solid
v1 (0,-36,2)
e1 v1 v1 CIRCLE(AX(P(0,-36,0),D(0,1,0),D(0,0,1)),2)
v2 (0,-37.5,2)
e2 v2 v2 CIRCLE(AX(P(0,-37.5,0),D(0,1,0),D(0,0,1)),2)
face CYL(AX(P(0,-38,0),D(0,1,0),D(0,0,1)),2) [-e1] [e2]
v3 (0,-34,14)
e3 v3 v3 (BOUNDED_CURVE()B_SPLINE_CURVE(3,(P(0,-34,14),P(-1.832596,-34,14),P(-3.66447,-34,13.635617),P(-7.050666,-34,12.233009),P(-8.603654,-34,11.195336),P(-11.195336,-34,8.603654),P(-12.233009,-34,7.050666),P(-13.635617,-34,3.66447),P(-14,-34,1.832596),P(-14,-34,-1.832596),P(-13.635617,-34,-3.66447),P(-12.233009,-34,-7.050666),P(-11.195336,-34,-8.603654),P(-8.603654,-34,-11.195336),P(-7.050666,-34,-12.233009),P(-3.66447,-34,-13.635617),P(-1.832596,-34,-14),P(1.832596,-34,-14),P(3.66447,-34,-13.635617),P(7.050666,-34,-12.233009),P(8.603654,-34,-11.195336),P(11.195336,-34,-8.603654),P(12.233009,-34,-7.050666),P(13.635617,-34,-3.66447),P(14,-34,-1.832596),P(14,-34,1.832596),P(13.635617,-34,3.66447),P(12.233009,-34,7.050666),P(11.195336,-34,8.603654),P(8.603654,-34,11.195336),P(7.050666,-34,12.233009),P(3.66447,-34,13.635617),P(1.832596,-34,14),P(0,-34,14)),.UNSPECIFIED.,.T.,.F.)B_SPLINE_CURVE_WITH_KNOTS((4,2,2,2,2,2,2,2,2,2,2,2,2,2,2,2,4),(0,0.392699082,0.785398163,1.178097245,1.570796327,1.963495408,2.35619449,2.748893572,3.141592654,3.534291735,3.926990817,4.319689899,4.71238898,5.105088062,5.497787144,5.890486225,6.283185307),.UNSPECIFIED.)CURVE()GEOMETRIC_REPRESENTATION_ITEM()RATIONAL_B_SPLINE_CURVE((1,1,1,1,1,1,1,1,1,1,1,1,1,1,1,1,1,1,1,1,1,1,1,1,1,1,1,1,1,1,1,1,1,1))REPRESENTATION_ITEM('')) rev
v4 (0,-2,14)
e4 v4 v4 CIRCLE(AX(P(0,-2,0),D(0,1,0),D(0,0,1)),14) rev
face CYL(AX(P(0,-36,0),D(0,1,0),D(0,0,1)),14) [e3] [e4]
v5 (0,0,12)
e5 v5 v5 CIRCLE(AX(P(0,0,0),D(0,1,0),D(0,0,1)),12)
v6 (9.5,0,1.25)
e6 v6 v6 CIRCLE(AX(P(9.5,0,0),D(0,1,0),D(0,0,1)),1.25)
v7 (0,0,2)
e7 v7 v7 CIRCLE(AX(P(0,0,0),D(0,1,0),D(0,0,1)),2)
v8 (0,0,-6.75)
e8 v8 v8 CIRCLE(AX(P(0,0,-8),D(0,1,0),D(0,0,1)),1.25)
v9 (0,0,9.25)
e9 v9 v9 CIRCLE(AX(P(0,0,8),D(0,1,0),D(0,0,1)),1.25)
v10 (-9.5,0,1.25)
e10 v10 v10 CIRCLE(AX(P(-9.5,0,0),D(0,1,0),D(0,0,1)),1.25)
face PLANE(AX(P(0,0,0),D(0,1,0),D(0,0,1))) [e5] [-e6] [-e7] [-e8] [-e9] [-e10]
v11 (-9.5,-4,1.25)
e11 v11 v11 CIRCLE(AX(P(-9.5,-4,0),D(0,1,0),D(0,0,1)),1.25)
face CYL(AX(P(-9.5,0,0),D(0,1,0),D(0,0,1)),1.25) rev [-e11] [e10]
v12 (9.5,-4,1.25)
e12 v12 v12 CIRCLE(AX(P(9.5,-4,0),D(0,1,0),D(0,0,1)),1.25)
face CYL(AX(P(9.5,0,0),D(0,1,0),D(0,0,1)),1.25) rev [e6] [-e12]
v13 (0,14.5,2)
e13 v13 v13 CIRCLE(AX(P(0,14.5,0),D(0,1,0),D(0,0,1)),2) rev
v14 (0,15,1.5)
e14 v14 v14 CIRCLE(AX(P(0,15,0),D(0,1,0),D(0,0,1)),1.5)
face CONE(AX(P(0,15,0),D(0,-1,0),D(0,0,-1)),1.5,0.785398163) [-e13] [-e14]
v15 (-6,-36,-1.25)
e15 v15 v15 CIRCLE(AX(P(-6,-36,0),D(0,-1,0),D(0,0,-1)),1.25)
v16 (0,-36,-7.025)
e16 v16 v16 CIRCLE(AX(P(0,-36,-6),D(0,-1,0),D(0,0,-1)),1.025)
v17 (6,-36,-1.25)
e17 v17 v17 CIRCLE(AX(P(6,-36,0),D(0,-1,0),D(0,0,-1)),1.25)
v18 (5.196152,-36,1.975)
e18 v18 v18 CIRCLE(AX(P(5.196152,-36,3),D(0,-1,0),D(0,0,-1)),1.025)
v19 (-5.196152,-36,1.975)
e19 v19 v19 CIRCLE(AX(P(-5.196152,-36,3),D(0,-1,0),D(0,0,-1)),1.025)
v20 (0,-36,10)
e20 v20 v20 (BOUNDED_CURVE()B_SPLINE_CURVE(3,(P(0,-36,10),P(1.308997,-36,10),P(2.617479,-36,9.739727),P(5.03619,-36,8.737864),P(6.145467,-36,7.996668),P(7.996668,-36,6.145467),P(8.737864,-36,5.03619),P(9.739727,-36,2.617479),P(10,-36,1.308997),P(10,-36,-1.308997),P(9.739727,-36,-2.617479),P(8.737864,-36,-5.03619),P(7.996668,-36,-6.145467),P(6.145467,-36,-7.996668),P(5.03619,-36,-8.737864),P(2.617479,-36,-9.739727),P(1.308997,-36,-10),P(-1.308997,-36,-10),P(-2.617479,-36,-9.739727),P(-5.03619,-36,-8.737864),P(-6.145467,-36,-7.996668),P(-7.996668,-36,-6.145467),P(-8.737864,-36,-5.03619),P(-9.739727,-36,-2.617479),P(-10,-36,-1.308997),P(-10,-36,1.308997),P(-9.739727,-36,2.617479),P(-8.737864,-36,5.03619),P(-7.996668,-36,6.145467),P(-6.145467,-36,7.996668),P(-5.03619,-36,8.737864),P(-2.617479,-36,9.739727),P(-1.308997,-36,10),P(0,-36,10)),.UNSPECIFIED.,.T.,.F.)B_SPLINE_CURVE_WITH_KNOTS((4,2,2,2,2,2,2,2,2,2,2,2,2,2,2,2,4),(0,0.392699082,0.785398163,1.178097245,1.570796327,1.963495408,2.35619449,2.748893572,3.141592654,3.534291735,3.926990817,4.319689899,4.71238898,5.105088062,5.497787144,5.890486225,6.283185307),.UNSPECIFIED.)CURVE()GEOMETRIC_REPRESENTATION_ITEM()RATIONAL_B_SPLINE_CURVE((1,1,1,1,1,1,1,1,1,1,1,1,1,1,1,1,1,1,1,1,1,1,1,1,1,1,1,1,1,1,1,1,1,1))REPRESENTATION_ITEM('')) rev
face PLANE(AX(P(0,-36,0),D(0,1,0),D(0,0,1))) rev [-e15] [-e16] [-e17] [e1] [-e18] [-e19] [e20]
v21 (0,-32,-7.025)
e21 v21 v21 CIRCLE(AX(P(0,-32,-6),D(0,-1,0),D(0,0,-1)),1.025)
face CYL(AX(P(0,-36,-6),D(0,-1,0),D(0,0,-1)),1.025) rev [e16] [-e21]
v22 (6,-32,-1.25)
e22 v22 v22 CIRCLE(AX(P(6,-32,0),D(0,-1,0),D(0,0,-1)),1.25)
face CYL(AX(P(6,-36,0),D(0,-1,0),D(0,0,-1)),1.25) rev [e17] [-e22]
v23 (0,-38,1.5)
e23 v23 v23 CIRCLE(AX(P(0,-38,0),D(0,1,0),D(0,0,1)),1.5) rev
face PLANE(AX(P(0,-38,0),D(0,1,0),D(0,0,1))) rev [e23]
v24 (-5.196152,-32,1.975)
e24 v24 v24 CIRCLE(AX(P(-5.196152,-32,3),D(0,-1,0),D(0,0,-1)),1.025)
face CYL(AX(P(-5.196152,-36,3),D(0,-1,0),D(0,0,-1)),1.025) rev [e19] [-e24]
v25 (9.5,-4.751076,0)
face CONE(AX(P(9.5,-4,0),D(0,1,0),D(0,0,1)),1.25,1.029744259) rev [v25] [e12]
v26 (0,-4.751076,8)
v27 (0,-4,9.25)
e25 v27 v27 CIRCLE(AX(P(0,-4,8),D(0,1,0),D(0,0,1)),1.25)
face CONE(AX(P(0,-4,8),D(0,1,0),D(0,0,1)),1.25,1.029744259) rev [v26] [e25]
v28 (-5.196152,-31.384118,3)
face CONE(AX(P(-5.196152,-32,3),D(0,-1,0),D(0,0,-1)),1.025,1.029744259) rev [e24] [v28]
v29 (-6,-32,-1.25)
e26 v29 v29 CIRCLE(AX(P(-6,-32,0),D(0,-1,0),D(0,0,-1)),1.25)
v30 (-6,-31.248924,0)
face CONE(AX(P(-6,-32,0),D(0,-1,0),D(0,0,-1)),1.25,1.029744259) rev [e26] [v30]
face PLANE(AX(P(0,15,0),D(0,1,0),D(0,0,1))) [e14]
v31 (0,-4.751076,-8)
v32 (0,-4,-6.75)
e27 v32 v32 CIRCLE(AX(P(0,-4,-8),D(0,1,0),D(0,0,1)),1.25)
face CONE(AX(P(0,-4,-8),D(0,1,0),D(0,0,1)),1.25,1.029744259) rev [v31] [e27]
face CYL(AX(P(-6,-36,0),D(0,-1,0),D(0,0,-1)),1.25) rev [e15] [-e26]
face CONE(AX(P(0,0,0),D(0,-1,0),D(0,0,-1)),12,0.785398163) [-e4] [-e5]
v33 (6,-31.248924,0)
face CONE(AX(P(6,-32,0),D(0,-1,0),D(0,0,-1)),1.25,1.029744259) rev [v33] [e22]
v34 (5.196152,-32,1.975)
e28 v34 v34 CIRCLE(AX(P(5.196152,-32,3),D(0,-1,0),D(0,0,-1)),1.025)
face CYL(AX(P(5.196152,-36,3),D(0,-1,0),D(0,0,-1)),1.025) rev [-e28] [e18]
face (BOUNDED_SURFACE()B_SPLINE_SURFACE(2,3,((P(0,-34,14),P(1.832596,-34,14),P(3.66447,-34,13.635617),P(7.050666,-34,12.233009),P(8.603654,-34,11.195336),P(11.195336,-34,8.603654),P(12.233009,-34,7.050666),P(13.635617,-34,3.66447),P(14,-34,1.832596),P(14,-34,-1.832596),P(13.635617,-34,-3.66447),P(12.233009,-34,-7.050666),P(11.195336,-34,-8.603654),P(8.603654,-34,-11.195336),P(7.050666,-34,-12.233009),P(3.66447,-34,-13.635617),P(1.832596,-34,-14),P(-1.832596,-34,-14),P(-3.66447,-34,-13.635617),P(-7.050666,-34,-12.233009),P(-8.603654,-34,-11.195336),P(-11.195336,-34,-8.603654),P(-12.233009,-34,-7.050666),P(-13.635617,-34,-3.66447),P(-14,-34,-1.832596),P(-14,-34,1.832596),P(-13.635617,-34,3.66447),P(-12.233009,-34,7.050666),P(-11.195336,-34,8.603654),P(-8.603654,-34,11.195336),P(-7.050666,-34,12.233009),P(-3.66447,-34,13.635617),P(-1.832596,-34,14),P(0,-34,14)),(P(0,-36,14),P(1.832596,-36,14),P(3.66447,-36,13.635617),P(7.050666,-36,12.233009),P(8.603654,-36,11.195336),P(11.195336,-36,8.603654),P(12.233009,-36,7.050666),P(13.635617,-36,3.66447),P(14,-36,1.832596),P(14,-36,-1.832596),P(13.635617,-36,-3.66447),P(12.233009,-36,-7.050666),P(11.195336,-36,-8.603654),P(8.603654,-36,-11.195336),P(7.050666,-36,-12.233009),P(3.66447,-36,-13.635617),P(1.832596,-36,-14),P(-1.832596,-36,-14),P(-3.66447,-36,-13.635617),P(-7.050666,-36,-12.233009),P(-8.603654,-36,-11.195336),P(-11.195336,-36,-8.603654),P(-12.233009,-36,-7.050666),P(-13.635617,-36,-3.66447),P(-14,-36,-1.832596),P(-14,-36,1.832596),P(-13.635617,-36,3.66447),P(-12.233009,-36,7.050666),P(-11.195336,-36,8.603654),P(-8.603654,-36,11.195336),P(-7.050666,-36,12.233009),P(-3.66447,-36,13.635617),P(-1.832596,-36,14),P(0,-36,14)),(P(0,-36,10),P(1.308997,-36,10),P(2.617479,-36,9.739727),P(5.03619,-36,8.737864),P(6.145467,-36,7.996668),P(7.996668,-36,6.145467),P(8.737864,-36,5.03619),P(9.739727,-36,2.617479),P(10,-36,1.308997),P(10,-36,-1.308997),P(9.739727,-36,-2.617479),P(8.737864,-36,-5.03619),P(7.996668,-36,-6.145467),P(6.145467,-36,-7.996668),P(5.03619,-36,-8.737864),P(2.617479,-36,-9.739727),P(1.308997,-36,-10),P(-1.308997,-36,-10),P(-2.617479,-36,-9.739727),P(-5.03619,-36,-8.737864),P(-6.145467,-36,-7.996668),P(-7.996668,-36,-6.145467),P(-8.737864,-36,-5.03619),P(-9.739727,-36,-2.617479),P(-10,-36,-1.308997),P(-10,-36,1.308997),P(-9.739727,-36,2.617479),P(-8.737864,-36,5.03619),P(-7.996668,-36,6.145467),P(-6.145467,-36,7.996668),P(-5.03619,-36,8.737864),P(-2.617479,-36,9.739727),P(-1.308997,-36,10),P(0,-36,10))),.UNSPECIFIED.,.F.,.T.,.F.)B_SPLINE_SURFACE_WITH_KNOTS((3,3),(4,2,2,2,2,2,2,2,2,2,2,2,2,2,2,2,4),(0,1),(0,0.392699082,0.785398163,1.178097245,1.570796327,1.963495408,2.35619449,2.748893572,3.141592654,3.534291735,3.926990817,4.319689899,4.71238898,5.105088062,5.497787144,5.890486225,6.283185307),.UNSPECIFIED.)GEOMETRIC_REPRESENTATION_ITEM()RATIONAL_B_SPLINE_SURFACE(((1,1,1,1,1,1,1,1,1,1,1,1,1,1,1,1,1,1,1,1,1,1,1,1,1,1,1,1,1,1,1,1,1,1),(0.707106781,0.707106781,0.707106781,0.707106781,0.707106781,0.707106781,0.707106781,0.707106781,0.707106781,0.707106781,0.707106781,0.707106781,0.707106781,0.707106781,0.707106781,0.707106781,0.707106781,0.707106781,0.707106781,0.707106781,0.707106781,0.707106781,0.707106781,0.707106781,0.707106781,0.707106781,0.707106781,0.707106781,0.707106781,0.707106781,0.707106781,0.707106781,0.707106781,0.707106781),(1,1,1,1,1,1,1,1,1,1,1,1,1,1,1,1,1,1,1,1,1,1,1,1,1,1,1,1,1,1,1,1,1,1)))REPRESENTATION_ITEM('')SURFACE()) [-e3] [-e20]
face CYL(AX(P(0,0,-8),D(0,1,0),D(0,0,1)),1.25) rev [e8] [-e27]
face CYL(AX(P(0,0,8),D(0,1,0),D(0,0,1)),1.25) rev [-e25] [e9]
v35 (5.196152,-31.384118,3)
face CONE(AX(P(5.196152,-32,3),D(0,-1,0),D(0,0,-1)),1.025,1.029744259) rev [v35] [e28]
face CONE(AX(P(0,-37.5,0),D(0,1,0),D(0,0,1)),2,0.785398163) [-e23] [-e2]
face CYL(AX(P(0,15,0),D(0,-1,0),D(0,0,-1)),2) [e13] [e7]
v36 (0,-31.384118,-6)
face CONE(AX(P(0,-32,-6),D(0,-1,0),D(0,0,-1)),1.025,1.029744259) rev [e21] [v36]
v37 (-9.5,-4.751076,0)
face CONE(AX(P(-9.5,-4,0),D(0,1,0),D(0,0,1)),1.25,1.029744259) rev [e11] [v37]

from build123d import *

# Parameters (mm, degrees)
SKETCH1_R                    = 14
BOSS_EXTRUDE1_DEPTH          = 36
SKETCH1_3_R                  = 2
BOSS_EXTRUDE2_DEPTH          = 15
BOSS_EXTRUDE3_START          = -38
SKETCH1_4_R                  = 2
BOSS_EXTRUDE3_DEPTH          = 2
CHAMFER1_SIZE                = 0.5
CHAMFER2_SIZE                = 2
FILLET1_SIZE                 = 2
FILLET1_SIZE_2               = 4
M3X0_5_TAPPED_HOLE2_D        = 2.5
M3X0_5_TAPPED_HOLE2_DEPTH    = 4
M3X0_5_TAPPED_HOLE2_TIP      = 0.751075774
M3X0_5_TAPPED_HOLE3_D        = 2.5
M3X0_5_TAPPED_HOLE3_DEPTH    = 4
M3X0_5_TAPPED_HOLE3_TIP      = 0.751075774
M2_5X0_45_TAPPED_HOLE1_D     = 2.05
M2_5X0_45_TAPPED_HOLE1_DEPTH = 4
M2_5X0_45_TAPPED_HOLE1_TIP   = 0.615882135


with BuildPart() as part:
    # Sketch1 → Boss-Extrude1 (new body)
    with BuildSketch(Plane(origin=(0, 0, 0), x_dir=(1, 0, 0), z_dir=(0, 1, 0))):
        with Locations(Location((0, 0, 0), (0, 0, 270))):
            Circle(SKETCH1_R)
    extrude(amount=-BOSS_EXTRUDE1_DEPTH)

    # Sketch1<3> → Boss-Extrude2 (add)
    with BuildSketch(Plane(origin=(0, 0, 0), x_dir=(1, 0, 0), z_dir=(0, 1, 0))):
        with Locations(Location((0, 0, 0), (0, 0, 270))):
            Circle(SKETCH1_3_R)
    extrude(amount=BOSS_EXTRUDE2_DEPTH)

    # Sketch1<4> → Boss-Extrude3 (add)
    with BuildSketch(Plane(origin=(0, 0, 0), x_dir=(1, 0, 0), z_dir=(0, 1, 0)).offset(BOSS_EXTRUDE3_START)):
        with Locations(Location((0, 0, 0), (0, 0, 270))):
            Circle(SKETCH1_4_R)
    extrude(amount=BOSS_EXTRUDE3_DEPTH)

    # Chamfer1
    chamfer1_edges = [part.edges().sort_by_distance(p)[0] for p in [
        (0, -38, -2),
        (0, 15, -2),
    ]]
    chamfer(chamfer1_edges, length=CHAMFER1_SIZE)

    # Chamfer2
    chamfer2_edges = [part.edges().sort_by_distance(p)[0] for p in [
        (0, 0, -14),
    ]]
    chamfer(chamfer2_edges, length=CHAMFER2_SIZE)

    # Fillet1
    # an asymmetric fillet: 4, 2 mm, written as the material it takes off along each edge
    with BuildSketch(Plane(origin=(0, -36, 0), x_dir=(0, 0, 1), z_dir=(-1, 0, 0))) as fillet1_piece_1:
        with BuildLine():
            Bezier((14, FILLET1_SIZE), (14, 0), (14 - FILLET1_SIZE_2, 0), weights=[1, 0.707106781, 1])
            Line((14 - FILLET1_SIZE_2, 0), (14, 0))
            Line((14, 0), (14, FILLET1_SIZE))
        make_face()
    revolve(axis=Axis((0, -36, 0), (0, 1, 0)), mode=Mode.SUBTRACT)

    # M3x0.5 Tapped Hole2
    with Locations(Plane(origin=(0, 0, 0), x_dir=(1, 0, 0), z_dir=(0, 1, 0))):
        with Locations((9.5, 0), (0, 8), (0, -8), (-9.5, 0)):
            Hole(M3X0_5_TAPPED_HOLE2_D / 2, depth=M3X0_5_TAPPED_HOLE2_DEPTH)
            with Locations((0, 0, -(M3X0_5_TAPPED_HOLE2_DEPTH + M3X0_5_TAPPED_HOLE2_TIP / 2))):  # 118° drill point
                Cone(0, M3X0_5_TAPPED_HOLE2_D / 2, M3X0_5_TAPPED_HOLE2_TIP, mode=Mode.SUBTRACT)

    # M3x0.5 Tapped Hole3
    with Locations(Plane.XZ.offset(36)):
        with Locations((6, 0), (-6, 0)):
            Hole(M3X0_5_TAPPED_HOLE3_D / 2, depth=M3X0_5_TAPPED_HOLE3_DEPTH)
            with Locations((0, 0, -(M3X0_5_TAPPED_HOLE3_DEPTH + M3X0_5_TAPPED_HOLE3_TIP / 2))):  # 118° drill point
                Cone(0, M3X0_5_TAPPED_HOLE3_D / 2, M3X0_5_TAPPED_HOLE3_TIP, mode=Mode.SUBTRACT)

    # M2.5x0.45 Tapped Hole1
    with Locations(Plane(origin=(0, -36, 0), x_dir=(-1, 0, 0), z_dir=(0, -1, 0))):
        with Locations((0, 6), (5.196152423, -3), (-5.196152423, -3)):
            Hole(M2_5X0_45_TAPPED_HOLE1_D / 2, depth=M2_5X0_45_TAPPED_HOLE1_DEPTH)
            with Locations((0, 0, -(M2_5X0_45_TAPPED_HOLE1_DEPTH + M2_5X0_45_TAPPED_HOLE1_TIP / 2))):  # 118° drill point
                Cone(0, M2_5X0_45_TAPPED_HOLE1_D / 2, M2_5X0_45_TAPPED_HOLE1_TIP, mode=Mode.SUBTRACT)


solid = part.part
